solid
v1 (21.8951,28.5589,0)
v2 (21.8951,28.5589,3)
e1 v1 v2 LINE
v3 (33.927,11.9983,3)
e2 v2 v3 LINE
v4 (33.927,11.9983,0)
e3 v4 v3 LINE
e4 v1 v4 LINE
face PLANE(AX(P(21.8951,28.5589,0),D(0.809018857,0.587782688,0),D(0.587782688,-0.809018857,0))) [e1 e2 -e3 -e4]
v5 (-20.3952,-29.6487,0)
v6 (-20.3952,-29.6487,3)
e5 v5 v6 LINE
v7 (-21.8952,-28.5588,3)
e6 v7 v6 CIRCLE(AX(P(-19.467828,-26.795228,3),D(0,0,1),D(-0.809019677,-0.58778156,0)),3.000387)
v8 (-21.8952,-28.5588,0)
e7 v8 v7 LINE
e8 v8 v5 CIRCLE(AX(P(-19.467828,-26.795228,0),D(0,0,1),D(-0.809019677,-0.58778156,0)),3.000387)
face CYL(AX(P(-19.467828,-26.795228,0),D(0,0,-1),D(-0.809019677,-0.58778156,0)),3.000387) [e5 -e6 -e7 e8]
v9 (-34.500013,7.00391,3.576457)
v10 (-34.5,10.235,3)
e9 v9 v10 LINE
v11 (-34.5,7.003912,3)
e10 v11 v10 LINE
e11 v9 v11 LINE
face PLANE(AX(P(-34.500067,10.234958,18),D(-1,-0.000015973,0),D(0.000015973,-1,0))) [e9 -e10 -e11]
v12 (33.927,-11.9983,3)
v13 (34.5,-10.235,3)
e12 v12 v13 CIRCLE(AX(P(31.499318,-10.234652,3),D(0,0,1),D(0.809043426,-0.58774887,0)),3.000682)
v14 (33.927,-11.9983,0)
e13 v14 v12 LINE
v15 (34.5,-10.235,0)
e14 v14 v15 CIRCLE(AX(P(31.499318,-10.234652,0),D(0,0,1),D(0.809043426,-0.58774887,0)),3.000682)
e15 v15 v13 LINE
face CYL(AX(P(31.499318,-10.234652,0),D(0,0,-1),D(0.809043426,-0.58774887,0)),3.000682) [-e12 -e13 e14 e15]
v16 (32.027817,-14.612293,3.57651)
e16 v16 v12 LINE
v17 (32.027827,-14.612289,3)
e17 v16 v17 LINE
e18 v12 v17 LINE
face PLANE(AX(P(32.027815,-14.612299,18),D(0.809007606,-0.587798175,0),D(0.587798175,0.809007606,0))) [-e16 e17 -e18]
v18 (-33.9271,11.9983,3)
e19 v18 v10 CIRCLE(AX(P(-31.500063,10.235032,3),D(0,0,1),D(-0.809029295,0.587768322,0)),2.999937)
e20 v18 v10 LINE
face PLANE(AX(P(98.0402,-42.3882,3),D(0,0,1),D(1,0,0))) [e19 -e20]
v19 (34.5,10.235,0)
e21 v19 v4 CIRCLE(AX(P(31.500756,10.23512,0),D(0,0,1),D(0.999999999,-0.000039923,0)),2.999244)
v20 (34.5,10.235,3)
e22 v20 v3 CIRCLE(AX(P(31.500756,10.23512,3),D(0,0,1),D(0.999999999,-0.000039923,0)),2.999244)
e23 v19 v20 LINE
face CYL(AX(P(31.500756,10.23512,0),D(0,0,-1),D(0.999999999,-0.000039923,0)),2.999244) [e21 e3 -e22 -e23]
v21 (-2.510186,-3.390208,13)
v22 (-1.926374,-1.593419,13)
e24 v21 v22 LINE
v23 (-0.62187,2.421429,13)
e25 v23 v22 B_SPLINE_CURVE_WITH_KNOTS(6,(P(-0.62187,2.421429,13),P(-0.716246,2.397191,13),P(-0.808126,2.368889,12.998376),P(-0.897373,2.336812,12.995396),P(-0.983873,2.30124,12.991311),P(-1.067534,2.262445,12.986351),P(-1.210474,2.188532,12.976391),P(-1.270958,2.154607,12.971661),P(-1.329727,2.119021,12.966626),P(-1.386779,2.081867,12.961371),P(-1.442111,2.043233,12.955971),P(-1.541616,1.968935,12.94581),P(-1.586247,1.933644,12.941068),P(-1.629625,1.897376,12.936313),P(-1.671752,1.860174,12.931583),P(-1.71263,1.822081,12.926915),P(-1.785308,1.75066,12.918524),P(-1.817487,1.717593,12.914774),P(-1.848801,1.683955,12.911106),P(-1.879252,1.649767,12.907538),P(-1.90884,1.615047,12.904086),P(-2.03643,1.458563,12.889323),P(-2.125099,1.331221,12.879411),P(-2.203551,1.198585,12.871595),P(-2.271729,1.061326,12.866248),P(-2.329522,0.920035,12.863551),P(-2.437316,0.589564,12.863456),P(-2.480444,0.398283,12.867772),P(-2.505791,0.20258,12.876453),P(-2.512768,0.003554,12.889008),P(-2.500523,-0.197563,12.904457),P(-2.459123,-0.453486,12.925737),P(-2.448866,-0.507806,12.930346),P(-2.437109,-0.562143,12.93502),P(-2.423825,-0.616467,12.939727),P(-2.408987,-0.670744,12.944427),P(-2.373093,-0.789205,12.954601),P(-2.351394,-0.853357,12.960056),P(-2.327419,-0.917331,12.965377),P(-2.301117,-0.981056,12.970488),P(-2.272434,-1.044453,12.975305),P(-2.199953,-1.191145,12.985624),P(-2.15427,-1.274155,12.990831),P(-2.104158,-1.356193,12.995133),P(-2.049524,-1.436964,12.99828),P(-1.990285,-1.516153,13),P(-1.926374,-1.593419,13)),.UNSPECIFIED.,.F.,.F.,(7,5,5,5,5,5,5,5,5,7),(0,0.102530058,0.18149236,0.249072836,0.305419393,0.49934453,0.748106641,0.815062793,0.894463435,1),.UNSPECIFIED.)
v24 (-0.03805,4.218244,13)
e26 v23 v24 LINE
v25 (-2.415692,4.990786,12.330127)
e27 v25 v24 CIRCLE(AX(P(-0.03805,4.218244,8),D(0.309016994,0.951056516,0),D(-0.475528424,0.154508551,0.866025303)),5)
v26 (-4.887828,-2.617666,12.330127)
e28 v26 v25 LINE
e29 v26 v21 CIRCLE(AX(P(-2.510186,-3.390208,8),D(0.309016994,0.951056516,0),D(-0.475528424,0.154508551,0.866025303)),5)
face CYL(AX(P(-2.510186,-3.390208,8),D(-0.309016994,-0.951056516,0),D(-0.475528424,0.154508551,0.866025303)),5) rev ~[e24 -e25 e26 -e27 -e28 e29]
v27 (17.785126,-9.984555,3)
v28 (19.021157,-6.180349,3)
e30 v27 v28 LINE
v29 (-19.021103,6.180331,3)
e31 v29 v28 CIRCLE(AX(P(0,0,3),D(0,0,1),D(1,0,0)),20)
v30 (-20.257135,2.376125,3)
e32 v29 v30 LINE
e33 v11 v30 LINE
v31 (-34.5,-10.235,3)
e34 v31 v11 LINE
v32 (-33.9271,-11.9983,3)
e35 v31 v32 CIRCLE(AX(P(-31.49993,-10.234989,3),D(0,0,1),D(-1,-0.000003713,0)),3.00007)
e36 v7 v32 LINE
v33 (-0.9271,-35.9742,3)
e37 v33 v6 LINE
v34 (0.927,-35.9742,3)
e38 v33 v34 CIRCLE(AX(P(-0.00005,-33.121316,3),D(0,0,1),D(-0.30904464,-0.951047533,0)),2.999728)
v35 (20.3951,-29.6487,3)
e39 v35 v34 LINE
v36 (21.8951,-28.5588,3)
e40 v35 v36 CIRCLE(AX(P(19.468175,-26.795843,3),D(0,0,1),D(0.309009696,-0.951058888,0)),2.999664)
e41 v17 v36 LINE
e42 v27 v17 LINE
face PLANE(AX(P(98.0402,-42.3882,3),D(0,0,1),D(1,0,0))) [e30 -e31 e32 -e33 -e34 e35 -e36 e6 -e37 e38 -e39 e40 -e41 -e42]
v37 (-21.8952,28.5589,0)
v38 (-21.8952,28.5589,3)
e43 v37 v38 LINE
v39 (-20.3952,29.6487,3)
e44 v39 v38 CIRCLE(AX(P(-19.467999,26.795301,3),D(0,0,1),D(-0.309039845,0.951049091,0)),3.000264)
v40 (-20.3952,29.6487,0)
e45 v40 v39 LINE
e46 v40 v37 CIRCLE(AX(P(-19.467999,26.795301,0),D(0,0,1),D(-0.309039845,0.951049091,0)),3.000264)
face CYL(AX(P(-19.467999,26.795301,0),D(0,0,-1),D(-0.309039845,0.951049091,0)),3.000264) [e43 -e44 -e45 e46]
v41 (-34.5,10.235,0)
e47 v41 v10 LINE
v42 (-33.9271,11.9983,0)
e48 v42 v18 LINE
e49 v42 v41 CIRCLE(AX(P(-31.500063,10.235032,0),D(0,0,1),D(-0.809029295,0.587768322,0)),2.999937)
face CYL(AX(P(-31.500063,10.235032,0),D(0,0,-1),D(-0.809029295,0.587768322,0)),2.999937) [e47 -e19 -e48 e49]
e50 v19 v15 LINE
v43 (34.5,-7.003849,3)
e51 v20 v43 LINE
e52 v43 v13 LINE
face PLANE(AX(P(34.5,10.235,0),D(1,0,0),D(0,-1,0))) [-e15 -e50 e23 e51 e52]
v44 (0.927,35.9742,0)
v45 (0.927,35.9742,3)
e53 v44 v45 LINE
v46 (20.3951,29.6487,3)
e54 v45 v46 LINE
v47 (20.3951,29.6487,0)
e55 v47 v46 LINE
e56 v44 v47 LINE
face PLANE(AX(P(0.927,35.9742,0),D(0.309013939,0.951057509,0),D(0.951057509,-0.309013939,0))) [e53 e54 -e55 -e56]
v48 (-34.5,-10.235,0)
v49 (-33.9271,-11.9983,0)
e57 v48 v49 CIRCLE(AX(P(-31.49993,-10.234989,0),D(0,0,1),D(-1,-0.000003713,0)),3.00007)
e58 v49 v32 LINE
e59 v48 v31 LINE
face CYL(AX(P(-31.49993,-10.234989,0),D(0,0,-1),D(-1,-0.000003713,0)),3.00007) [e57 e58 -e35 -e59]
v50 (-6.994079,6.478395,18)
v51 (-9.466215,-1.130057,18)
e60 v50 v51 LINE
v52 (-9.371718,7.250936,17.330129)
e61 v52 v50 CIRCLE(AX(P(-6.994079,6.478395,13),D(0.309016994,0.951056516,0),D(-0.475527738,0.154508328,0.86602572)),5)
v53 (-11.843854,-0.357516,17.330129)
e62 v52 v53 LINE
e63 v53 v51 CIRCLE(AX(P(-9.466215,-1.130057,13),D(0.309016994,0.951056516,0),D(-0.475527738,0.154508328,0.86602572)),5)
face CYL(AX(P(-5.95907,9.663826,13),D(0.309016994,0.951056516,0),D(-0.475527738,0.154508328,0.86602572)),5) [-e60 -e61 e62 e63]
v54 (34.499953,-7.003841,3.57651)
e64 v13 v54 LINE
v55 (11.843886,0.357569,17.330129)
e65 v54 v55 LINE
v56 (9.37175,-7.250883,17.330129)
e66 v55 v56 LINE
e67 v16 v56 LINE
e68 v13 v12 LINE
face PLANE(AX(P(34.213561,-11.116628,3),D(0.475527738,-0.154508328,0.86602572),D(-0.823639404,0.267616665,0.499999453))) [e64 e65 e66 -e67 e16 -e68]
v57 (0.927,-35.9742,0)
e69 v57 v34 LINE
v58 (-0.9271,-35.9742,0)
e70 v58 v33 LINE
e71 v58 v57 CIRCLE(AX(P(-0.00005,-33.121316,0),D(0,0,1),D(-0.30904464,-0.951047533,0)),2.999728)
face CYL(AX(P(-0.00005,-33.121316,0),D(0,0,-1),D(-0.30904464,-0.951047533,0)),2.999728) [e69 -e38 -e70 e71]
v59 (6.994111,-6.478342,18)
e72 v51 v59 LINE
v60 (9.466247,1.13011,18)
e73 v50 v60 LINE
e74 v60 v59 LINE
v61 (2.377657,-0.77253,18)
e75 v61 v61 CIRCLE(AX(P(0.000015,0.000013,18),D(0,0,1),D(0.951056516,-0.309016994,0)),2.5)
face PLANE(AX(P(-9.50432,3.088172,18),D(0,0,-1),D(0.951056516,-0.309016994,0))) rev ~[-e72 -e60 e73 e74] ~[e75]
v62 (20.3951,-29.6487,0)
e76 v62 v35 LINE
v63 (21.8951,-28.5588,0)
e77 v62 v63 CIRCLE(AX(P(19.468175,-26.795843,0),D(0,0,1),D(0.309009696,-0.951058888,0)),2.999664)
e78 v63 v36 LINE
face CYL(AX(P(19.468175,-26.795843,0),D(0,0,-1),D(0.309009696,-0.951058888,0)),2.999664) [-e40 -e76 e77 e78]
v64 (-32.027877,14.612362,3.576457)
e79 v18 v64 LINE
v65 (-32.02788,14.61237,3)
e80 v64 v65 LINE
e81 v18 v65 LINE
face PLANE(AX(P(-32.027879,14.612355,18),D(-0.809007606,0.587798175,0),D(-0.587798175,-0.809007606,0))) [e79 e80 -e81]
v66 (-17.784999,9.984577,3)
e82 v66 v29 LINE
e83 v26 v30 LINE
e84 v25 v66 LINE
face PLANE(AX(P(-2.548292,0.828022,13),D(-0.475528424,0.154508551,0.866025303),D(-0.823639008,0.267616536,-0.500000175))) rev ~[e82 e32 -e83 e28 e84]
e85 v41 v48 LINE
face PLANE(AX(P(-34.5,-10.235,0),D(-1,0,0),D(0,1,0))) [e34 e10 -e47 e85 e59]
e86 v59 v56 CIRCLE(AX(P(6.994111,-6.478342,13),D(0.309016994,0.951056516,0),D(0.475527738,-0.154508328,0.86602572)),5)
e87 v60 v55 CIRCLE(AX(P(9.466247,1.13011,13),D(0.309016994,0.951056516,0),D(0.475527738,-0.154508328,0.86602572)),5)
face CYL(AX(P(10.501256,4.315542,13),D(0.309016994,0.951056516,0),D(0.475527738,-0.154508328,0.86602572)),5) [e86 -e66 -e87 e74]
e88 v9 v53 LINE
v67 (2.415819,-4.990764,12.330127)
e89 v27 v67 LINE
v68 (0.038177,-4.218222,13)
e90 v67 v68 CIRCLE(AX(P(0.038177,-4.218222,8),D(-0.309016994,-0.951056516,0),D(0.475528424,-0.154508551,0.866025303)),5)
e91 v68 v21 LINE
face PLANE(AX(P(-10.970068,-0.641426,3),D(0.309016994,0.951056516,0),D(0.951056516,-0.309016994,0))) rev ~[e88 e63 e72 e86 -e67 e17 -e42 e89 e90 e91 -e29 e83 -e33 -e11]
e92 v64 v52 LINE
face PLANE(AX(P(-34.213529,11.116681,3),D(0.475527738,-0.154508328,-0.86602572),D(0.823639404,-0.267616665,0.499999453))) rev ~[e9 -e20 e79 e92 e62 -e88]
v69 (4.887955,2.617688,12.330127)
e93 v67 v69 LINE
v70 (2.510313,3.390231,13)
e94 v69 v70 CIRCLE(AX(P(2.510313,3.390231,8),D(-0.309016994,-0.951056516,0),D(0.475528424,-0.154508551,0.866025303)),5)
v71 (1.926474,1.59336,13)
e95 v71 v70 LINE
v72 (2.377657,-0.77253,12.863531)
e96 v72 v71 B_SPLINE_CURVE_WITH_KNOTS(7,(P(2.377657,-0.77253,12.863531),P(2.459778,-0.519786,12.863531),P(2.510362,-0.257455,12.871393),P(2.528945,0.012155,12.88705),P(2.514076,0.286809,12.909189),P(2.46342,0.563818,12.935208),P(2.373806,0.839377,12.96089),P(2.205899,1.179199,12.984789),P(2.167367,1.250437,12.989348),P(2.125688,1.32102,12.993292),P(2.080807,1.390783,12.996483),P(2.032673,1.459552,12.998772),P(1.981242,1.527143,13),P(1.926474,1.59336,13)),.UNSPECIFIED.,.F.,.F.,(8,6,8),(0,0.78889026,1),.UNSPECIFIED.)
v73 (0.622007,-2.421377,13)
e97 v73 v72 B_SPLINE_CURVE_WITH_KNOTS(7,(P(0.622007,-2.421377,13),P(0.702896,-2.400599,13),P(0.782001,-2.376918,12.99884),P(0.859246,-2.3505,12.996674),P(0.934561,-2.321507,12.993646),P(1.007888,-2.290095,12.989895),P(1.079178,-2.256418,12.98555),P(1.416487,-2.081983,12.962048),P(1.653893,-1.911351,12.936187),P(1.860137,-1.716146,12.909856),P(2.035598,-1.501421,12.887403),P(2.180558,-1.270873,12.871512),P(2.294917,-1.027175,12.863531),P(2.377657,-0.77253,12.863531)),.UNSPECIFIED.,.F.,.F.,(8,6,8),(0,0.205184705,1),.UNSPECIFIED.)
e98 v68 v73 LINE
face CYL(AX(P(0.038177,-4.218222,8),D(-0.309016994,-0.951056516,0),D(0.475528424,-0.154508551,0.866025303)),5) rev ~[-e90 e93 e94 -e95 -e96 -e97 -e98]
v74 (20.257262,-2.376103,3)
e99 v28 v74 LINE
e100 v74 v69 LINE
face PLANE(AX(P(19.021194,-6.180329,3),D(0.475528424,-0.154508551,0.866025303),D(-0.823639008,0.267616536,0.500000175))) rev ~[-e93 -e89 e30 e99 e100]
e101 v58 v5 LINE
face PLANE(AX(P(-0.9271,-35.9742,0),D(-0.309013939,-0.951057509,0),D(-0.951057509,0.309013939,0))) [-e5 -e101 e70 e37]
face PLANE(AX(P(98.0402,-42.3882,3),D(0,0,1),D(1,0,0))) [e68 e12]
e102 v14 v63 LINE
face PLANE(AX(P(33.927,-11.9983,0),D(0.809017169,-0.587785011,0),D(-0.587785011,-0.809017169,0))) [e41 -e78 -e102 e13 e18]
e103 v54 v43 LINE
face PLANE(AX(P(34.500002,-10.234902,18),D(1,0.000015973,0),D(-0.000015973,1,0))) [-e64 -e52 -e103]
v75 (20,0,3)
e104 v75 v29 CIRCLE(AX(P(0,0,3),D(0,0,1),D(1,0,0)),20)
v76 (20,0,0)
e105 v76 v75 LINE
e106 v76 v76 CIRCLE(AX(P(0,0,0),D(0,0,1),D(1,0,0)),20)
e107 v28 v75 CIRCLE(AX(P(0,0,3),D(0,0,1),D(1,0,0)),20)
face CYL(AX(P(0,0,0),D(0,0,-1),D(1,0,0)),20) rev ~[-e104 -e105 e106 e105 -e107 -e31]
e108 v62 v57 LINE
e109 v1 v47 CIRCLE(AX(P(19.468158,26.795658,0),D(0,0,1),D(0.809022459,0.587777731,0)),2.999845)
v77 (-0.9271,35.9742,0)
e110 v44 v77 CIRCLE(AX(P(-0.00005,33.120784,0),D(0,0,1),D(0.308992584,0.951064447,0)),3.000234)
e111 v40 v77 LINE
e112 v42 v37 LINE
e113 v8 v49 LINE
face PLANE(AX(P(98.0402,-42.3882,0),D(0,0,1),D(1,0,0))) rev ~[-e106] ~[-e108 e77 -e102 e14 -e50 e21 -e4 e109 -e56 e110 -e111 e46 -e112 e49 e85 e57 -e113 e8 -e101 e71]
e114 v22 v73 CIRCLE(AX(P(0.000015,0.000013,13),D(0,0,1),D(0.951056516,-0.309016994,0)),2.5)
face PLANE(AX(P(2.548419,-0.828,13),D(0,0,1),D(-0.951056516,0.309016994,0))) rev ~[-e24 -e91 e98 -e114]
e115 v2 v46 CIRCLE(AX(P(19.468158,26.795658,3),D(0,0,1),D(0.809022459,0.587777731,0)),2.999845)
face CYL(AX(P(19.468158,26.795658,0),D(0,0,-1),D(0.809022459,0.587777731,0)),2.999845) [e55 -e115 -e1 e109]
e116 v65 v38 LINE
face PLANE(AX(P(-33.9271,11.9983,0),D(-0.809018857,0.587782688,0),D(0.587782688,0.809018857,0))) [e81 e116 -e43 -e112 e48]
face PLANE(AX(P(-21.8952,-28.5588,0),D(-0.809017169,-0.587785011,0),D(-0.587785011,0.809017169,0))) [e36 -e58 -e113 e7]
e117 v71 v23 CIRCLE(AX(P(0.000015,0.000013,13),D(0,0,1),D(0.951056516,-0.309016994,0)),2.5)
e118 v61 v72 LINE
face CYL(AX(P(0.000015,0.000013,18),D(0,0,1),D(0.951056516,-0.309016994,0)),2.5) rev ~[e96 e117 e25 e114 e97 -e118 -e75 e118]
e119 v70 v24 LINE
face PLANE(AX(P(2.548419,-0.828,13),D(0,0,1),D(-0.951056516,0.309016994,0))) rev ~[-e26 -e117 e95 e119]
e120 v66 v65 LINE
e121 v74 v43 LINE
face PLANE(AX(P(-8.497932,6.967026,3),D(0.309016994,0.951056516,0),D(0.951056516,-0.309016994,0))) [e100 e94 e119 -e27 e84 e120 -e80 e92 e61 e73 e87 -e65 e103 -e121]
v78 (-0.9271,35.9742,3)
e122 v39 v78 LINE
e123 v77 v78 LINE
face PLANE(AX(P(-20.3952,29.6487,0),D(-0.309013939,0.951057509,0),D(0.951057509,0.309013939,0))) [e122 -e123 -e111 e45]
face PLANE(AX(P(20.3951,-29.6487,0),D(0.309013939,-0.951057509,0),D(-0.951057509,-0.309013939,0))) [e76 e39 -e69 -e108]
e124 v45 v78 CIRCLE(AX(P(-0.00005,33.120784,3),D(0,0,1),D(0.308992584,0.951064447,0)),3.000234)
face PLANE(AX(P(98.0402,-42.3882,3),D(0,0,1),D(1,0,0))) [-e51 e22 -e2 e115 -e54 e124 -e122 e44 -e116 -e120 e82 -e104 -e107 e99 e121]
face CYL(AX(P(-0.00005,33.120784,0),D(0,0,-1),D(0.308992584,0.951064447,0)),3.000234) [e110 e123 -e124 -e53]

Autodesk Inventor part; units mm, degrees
ref_plane "YZ Plane" through (0, 0, 0) normal (1, 0, 0) x (0, 1, 0)
ref_plane "XZ Plane" through (0, 0, 0) normal (0, 1, 0) x (-1, 0, 0)
ref_plane "XY Plane" through (0, 0, 0) normal (0, 0, 1) x (1, 0, 0)
ref_plane "Arbeitsebene1" through (98.0402, -42.3882, 0) normal (0, 0, 1) x (1, 0, 0)
sketch "Skizze1" plane through (98.0402, -42.3882, 0) normal (0, 0, 1) x (1, 0, 0)
  arc A0 (-132.5402, 32.1532) -> (-131.9673, 30.3899) centre (-129.5402, 32.1532) ccw projected
  line L0 (-119.9354, 13.8294) -> (-131.9673, 30.3899) projected
  arc A1 (-119.9354, 13.8294) -> (-118.4354, 12.7395) centre (-117.5083, 15.5927) ccw projected
  line L1 (-98.9673, 6.414) -> (-118.4354, 12.7395) projected
  arc A2 (-98.9673, 6.414) -> (-97.1132, 6.414) centre (-98.0402, 9.2672) ccw projected
  line L2 (-77.6451, 12.7395) -> (-97.1132, 6.414) projected
  arc A3 (-77.6451, 12.7395) -> (-76.1451, 13.8294) centre (-78.5722, 15.5927) ccw projected
  line L3 (-64.1132, 30.3899) -> (-76.1451, 13.8294) projected
  arc A4 (-64.1132, 30.3899) -> (-63.5402, 32.1532) centre (-66.5402, 32.1532) ccw projected
  line L4 (-63.5402, 52.6232) -> (-63.5402, 32.1532) projected
  arc A5 (-63.5402, 52.6232) -> (-64.1132, 54.3865) centre (-66.5402, 52.6232) ccw projected
  line L5 (-76.1451, 70.9471) -> (-64.1132, 54.3865) projected
  arc A6 (-76.1451, 70.9471) -> (-77.6451, 72.0369) centre (-78.5722, 69.1837) ccw projected
  line L6 (-97.1132, 78.3624) -> (-77.6451, 72.0369) projected
  arc A7 (-97.1132, 78.3624) -> (-98.9673, 78.3624) centre (-98.0402, 75.5093) ccw projected
  line L7 (-118.4354, 72.0369) -> (-98.9673, 78.3624) projected
  arc A8 (-118.4354, 72.0369) -> (-119.9354, 70.9471) centre (-117.5083, 69.1837) ccw projected
  line L8 (-131.9673, 54.3865) -> (-119.9354, 70.9471) projected
  arc A9 (-131.9673, 54.3865) -> (-132.5402, 52.6232) centre (-129.5402, 52.6232) ccw projected
  line L9 (-132.5402, 32.1532) -> (-132.5402, 52.6232) projected
  circle A10 centre (-98.0402, 42.3882) radius 20
  dimension "d0" = 40
extrude "Extrusion1" add sketch "Skizze1" along normal blind 3
ref_plane "Arbeitsebene2" through (-9.734, 3.1628, 3) normal (0.309017, 0.9510565, 0) x (0.9510565, -0.309017, 0)
sketch "Skizze2" plane through (-9.734, 3.1628, 3) normal (0.309017, 0.9510565, 0) x (0.9510565, -0.309017, 0)
  line L0 (46.2092, 3) -> (46.2092, 0) projected
  line L1 (-25.7393, 3) -> (-25.7393, 0) projected
  line L2 (30.235, 0) -> (-9.765, 0) projected
  line L3 (46.2092, 0) -> (20.2284, -15)
  line L4 (46.2092, 0) -> (76.2092, 0) construction
  line L5 (-25.7393, 0) -> (-19.4137, 0) projected
  line L6 (-25.7393, 0) -> (0.2415, -15)
  line L7 (0.2415, -15) -> (20.2284, -15)
  line L8 (30.235, 0) -> (12.9145, -10)
  line L9 (12.9145, -10) -> (7.5555, -10)
  line L10 (7.5555, -10) -> (-9.765, 0)
  line L11 (-25.7393, 0) -> (-9.765, 0)
  line L12 (30.235, 0) -> (46.2092, 0)
  point P0 (10.235, 3)
  point P1 (-19.4137, 0)
  dimension "d3" = 30
  dimension "d4" = 150
  dimension "d5" = 30
  dimension "d6" = 5
extrude "Extrusion2" add sketch "Skizze2" along normal mid plane 8 contours L12 L3 L7 L6 L5 L11 L10 L9 L8
sketch "Skizze3" plane through (-8.2683, 6.8924, 18) normal (0, 0, 1) x (0.9510565, -0.309017, 0)
  line L0 (44.9692, -8) -> (29.9935, -8) projected
  line L1 (29.9935, -8) -> (29.9935, -4) projected
  line L2 (-10.0065, -4) -> (-10.0065, -8) projected
  line L3 (-10.0065, -8) -> (-24.9823, -8) projected
  line L4 (-24.9823, -8) -> (-19.6552, -24.3951) projected
  arc A0 (-19.6552, -24.3951) -> (-18.5654, -25.8951) centre (-16.802, -23.4681) ccw projected
  line L5 (-18.5654, -25.8951) -> (-2.0049, -37.9271) projected
  arc A1 (-2.0049, -37.9271) -> (-0.2415, -38.5) centre (-0.2415, -35.5) ccw projected
  line L6 (-0.2415, -38.5) -> (20.2284, -38.5) projected
  arc A2 (20.2284, -38.5) -> (21.9918, -37.9271) centre (20.2284, -35.5) ccw projected
  line L7 (21.9918, -37.9271) -> (38.5523, -25.8951) projected
  arc A3 (38.5523, -25.8951) -> (39.6421, -24.3951) centre (36.789, -23.4681) ccw projected
  line L8 (39.6421, -24.3951) -> (44.9692, -8) projected
  line L9 (44.9692, -8) -> (45.9677, -4.9271) projected
  line L10 (29.9935, -4) -> (29.9935, 0) projected
  line L11 (29.9935, 0) -> (44.9692, 0) projected
  line L12 (44.9692, 0) -> (39.6421, 16.3951) projected
  arc A4 (39.6421, 16.3951) -> (38.5523, 17.8951) centre (36.789, 15.4681) ccw projected
  line L13 (38.5523, 17.8951) -> (21.9918, 29.9271) projected
  arc A5 (21.9918, 29.9271) -> (20.2284, 30.5) centre (20.2284, 27.5) ccw projected
  line L14 (20.2284, 30.5) -> (-0.2415, 30.5) projected
  arc A6 (-0.2415, 30.5) -> (-2.0049, 29.9271) centre (-0.2415, 27.5) ccw projected
  line L15 (-2.0049, 29.9271) -> (-18.5654, 17.8951) projected
  arc A7 (-18.5654, 17.8951) -> (-19.6552, 16.3951) centre (-16.802, 15.4681) ccw projected
  line L16 (-19.6552, 16.3951) -> (-24.9823, 0) projected
  line L17 (-24.9823, 0) -> (-10.0065, 0) projected
  line L18 (-10.0065, 0) -> (-10.0065, -4) projected
  line L19 (-24.9823, 0) -> (-25.9808, -3.0729) projected
  line L20 (-25.9808, -4.9271) -> (-24.9823, -8) projected
  line L21 (-25.9808, -4.9271) -> (-25.9808, -3.0729) projected
  line L22 (45.9677, -3.0729) -> (44.9692, 0) projected
  arc A8 (45.9677, -4.9271) -> (45.9677, -3.0729) centre (43.1145, -4) ccw projected
  circle A9 centre (9.9935, -4) radius 2.5
  line L23 (0, -8) -> (0, 0) projected
  line L24 (-25.9808, 0) -> (0, 0) projected
  line L25 (-25.9808, -3.0729) -> (-25.9808, 0) projected
  line L26 (-25.9808, -4.9271) -> (-25.9808, -3.0729) projected
  line L27 (-25.9808, -8) -> (-25.9808, -4.9271) projected
  line L28 (0, -8) -> (-25.9808, -8) projected
  line L29 (45.9677, -8) -> (45.9677, -4.9271) projected
  line L30 (45.9677, -3.0729) -> (45.9677, -4.9271) projected
  line L31 (45.9677, -3.0729) -> (45.9677, 0) projected
  line L32 (19.9869, 0) -> (45.9677, 0) projected
  line L33 (19.9869, -8) -> (19.9869, 0) projected
  line L34 (45.9677, -8) -> (19.9869, -8) projected
  line L35 (44.9692, -8) -> (29.9935, -8) projected
  line L36 (-10.0065, -8) -> (-24.9823, -8) projected
  line L37 (-24.9823, -8) -> (-19.6552, -24.3951) projected
  arc A10 (-19.6552, -24.3951) -> (-18.5654, -25.8951) centre (-16.802, -23.4681) ccw projected
  line L38 (-18.5654, -25.8951) -> (-2.0049, -37.9271) projected
  arc A11 (-2.0049, -37.9271) -> (-0.2415, -38.5) centre (-0.2415, -35.5) ccw projected
  line L39 (-0.2415, -38.5) -> (20.2284, -38.5) projected
  arc A12 (20.2284, -38.5) -> (21.9918, -37.9271) centre (20.2284, -35.5) ccw projected
  line L40 (21.9918, -37.9271) -> (38.5523, -25.8951) projected
  arc A13 (38.5523, -25.8951) -> (39.6421, -24.3951) centre (36.789, -23.4681) ccw projected
  line L41 (39.6421, -24.3951) -> (44.9692, -8) projected
  line L42 (29.9935, 0) -> (44.9692, 0) projected
  line L43 (44.9692, 0) -> (39.6421, 16.3951) projected
  arc A14 (39.6421, 16.3951) -> (38.5523, 17.8951) centre (36.789, 15.4681) ccw projected
  line L44 (38.5523, 17.8951) -> (21.9918, 29.9271) projected
  arc A15 (21.9918, 29.9271) -> (20.2284, 30.5) centre (20.2284, 27.5) ccw projected
  line L45 (20.2284, 30.5) -> (-0.2415, 30.5) projected
  arc A16 (-0.2415, 30.5) -> (-2.0049, 29.9271) centre (-0.2415, 27.5) ccw projected
  line L46 (-2.0049, 29.9271) -> (-18.5654, 17.8951) projected
  arc A17 (-18.5654, 17.8951) -> (-19.6552, 16.3951) centre (-16.802, 15.4681) ccw projected
  line L47 (-19.6552, 16.3951) -> (-24.9823, 0) projected
  line L48 (-24.9823, 0) -> (-10.0065, 0) projected
  line L49 (29.9935, -8) -> (29.9935, -4) projected
  arc A18 (-10.0065, -4) -> (29.9935, -4) centre (9.9935, -4) ccw projected
  line L50 (-10.0065, -4) -> (-10.0065, -8) projected
  arc A19 (29.9935, -4) -> (-10.0065, -4) centre (9.9935, -4) ccw projected
  arc A20 (-10.0065, -4) -> (29.9935, -4) centre (9.9935, -4) ccw projected
  line L51 (29.9935, -4) -> (29.9935, 0) projected
  line L52 (-10.0065, 0) -> (-10.0065, -4) projected
  arc A21 (29.9935, -4) -> (-10.0065, -4) centre (9.9935, -4) ccw projected
  point P0 (-25.9808, -3.0729)
  point P1 (-24.9823, 0)
  point P2 (-25.9808, -4.9271)
  point P3 (-24.9823, -8)
  point P4 (45.9677, -3.0729)
  point P5 (44.9692, 0)
  point P6 (45.9677, -4.9271)
  point P7 (44.9692, -8)
  dimension "d9" = 5
extrude "Extrusion3" cut sketch "Skizze3" against normal through all contours L9 L29 L34 | L22 L32 L31 | L28 L27 L20 | L19 L25 L24 | A9
fillet "Rundung1" radius 5 4 edges at (9.5044, -3.0882, 18) (-9.5044, 3.0882, 18) (2.5483, -0.828, 13) (-2.5483, 0.828, 13)
properties part number "Anglerfish_Lightplate"
